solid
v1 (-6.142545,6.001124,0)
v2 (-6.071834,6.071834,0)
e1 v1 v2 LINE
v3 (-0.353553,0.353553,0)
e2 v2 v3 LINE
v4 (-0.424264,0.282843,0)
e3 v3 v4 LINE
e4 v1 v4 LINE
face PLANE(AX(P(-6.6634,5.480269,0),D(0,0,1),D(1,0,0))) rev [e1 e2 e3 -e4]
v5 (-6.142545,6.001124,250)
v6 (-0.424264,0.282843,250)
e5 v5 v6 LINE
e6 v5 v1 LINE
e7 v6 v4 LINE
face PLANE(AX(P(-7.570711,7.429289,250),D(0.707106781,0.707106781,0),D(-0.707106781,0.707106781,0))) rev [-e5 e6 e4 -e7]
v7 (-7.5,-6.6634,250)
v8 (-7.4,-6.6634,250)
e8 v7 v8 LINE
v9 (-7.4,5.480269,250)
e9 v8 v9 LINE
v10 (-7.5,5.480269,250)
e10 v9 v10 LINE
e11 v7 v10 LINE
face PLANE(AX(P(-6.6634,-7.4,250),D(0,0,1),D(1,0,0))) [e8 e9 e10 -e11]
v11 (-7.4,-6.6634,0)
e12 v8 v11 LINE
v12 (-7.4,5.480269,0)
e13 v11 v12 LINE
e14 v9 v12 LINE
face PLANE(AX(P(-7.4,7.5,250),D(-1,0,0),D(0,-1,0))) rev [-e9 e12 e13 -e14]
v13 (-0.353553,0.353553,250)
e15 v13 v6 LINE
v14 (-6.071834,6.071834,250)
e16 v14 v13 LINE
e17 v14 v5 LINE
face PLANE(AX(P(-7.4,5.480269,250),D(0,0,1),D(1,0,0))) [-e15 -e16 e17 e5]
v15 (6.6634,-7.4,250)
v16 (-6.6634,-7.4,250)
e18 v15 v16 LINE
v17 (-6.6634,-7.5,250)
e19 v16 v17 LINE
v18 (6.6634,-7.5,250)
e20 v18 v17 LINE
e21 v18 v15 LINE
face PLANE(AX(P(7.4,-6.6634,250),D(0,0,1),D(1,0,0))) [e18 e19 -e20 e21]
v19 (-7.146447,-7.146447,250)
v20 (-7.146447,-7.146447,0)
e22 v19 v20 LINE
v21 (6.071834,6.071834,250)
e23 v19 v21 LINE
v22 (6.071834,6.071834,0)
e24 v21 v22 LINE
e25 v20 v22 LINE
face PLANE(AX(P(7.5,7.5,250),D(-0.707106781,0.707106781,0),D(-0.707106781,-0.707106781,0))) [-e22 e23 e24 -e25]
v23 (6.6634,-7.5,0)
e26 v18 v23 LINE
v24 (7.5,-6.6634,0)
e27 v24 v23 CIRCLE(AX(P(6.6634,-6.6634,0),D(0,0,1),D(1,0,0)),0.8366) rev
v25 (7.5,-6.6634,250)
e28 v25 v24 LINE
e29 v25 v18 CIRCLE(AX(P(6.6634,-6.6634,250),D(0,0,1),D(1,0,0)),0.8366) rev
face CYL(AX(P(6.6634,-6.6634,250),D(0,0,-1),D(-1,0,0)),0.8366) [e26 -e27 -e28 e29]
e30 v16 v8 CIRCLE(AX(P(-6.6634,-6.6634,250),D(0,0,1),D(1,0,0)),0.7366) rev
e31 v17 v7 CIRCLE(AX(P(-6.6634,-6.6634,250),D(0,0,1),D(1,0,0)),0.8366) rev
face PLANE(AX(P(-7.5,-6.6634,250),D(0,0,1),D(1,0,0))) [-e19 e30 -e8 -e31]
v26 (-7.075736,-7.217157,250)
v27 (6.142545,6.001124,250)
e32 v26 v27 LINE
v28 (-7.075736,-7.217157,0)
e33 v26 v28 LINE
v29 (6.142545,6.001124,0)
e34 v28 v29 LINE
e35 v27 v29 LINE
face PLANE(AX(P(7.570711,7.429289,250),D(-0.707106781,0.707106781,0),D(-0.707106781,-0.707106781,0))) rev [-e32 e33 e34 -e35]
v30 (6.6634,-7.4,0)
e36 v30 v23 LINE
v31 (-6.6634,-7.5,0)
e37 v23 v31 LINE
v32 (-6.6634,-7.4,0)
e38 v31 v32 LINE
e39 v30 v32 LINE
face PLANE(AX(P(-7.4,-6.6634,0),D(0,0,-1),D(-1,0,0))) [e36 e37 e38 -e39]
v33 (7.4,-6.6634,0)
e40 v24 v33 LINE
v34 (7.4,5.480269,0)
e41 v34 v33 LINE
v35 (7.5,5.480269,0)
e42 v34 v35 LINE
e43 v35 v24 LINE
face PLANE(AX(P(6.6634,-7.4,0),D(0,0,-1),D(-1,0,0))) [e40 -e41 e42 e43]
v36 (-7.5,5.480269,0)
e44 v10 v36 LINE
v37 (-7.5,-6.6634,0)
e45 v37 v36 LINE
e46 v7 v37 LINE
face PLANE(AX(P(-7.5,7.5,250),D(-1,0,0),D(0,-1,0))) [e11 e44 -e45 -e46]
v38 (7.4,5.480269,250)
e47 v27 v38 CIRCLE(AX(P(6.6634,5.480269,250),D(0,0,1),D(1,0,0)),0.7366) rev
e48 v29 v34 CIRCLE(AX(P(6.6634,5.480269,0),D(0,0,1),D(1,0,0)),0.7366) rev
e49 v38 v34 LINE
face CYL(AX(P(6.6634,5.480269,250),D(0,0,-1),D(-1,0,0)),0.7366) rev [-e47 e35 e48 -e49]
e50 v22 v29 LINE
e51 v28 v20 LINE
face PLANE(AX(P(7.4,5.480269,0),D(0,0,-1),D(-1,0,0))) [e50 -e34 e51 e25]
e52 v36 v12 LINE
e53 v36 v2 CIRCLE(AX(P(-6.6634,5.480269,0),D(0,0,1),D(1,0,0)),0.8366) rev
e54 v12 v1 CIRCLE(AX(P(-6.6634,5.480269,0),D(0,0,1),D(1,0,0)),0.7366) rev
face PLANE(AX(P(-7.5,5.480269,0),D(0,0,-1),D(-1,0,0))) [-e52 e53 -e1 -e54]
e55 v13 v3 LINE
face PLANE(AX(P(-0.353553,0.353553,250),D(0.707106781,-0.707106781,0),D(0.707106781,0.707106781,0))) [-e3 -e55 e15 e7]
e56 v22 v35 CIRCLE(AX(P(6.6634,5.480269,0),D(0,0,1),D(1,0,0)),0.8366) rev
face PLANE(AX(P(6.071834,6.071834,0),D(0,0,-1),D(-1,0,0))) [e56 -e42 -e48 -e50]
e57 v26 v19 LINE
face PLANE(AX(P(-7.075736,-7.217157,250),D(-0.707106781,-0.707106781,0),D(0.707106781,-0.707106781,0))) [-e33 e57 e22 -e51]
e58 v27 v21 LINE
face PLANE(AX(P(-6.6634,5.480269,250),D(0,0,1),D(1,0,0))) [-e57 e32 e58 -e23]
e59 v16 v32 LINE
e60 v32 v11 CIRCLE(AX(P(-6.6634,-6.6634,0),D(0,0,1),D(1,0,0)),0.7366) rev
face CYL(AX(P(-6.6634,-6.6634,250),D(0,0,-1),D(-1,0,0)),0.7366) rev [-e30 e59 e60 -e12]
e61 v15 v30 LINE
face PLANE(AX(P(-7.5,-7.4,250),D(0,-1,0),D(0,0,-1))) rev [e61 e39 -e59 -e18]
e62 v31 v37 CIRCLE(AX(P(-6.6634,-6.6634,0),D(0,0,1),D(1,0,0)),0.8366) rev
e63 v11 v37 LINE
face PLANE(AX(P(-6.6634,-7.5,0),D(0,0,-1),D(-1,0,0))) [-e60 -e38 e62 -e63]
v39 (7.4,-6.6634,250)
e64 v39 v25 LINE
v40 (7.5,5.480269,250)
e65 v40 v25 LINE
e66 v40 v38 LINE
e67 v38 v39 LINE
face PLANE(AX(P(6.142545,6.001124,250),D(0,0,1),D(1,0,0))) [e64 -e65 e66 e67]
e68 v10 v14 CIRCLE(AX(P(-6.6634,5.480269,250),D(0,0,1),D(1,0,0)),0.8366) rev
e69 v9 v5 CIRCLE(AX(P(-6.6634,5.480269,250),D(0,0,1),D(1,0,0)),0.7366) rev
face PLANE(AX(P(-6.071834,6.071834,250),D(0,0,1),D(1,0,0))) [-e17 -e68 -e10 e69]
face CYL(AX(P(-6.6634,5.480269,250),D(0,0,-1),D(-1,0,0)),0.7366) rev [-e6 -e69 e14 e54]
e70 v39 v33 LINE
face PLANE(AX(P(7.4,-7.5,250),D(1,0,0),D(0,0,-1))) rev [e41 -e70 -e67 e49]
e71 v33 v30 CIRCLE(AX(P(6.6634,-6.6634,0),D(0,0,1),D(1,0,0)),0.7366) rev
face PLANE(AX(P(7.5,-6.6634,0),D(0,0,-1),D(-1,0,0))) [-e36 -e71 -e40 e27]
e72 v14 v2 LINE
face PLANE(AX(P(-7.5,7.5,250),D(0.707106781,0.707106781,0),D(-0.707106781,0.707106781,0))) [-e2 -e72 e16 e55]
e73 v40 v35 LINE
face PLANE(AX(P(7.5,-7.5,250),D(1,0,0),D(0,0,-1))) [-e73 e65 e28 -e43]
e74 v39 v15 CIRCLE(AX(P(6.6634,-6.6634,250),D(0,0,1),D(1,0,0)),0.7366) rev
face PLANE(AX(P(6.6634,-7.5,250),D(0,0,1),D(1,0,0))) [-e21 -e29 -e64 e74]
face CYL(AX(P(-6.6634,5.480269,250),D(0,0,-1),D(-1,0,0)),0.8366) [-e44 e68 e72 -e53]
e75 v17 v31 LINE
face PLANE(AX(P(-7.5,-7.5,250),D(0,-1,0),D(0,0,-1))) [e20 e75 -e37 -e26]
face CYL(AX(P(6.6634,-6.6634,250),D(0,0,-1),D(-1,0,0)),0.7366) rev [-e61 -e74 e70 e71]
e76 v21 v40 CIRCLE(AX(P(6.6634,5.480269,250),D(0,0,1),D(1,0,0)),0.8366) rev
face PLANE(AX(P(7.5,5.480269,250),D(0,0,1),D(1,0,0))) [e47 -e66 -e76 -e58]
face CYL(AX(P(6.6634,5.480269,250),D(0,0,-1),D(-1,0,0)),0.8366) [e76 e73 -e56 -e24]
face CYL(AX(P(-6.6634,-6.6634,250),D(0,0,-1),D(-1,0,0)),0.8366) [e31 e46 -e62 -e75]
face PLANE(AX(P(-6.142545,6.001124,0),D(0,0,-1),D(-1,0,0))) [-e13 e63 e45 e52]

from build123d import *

# Parameters (mm, degrees)
Z_KLADN_PLECH1_DEPTH = 250


# Sheet-metal steps are written as plain solids
with BuildPart() as part:
    # Skica1 → Základní plech1 (new body)
    with BuildSketch(Plane.XY):
        with BuildLine():
            Line((-0.353553391, 0.353553391), (-6.071834467, 6.071834467))
            ThreePointArc((-6.071834467, 6.071834467), (-6.98355296, 6.253186551), (-7.5, 5.480268934))
            Line((-7.5, 5.480268934), (-7.5, -6.6634))
            ThreePointArc((-7.5, -6.6634), (-7.254965533, -7.254965533), (-6.6634, -7.5))
            Line((-6.6634, -7.5), (6.6634, -7.5))
            ThreePointArc((6.6634, -7.5), (7.254965533, -7.254965533), (7.5, -6.6634))
            Line((7.5, -6.6634), (7.5, 5.480268934))
            ThreePointArc((7.5, 5.480268934), (6.98355296, 6.253186551), (6.071834467, 6.071834467))
            Line((6.071834467, 6.071834467), (-7.146446609, -7.146446609))
            Line((-7.146446609, -7.146446609), (-7.075735931, -7.217157288))
            Line((-7.075735931, -7.217157288), (6.142545145, 6.001123789))
            ThreePointArc((6.142545145, 6.001123789), (6.945284616, 6.160798597), (7.4, 5.480268934))
            Line((7.4, 5.480268934), (7.4, -6.6634))
            ThreePointArc((7.4, -6.6634), (7.184254855, -7.184254855), (6.6634, -7.4))
            Line((6.6634, -7.4), (-6.6634, -7.4))
            ThreePointArc((-6.6634, -7.4), (-7.184254855, -7.184254855), (-7.4, -6.6634))
            Line((-7.4, -6.6634), (-7.4, 5.480268934))
            ThreePointArc((-7.4, 5.480268934), (-6.945284616, 6.160798597), (-6.142545145, 6.001123789))
            Line((-6.142545145, 6.001123789), (-0.424264069, 0.282842712))
            Line((-0.424264069, 0.282842712), (-0.353553391, 0.353553391))
        make_face()
    extrude(amount=Z_KLADN_PLECH1_DEPTH)


solid = part.part
